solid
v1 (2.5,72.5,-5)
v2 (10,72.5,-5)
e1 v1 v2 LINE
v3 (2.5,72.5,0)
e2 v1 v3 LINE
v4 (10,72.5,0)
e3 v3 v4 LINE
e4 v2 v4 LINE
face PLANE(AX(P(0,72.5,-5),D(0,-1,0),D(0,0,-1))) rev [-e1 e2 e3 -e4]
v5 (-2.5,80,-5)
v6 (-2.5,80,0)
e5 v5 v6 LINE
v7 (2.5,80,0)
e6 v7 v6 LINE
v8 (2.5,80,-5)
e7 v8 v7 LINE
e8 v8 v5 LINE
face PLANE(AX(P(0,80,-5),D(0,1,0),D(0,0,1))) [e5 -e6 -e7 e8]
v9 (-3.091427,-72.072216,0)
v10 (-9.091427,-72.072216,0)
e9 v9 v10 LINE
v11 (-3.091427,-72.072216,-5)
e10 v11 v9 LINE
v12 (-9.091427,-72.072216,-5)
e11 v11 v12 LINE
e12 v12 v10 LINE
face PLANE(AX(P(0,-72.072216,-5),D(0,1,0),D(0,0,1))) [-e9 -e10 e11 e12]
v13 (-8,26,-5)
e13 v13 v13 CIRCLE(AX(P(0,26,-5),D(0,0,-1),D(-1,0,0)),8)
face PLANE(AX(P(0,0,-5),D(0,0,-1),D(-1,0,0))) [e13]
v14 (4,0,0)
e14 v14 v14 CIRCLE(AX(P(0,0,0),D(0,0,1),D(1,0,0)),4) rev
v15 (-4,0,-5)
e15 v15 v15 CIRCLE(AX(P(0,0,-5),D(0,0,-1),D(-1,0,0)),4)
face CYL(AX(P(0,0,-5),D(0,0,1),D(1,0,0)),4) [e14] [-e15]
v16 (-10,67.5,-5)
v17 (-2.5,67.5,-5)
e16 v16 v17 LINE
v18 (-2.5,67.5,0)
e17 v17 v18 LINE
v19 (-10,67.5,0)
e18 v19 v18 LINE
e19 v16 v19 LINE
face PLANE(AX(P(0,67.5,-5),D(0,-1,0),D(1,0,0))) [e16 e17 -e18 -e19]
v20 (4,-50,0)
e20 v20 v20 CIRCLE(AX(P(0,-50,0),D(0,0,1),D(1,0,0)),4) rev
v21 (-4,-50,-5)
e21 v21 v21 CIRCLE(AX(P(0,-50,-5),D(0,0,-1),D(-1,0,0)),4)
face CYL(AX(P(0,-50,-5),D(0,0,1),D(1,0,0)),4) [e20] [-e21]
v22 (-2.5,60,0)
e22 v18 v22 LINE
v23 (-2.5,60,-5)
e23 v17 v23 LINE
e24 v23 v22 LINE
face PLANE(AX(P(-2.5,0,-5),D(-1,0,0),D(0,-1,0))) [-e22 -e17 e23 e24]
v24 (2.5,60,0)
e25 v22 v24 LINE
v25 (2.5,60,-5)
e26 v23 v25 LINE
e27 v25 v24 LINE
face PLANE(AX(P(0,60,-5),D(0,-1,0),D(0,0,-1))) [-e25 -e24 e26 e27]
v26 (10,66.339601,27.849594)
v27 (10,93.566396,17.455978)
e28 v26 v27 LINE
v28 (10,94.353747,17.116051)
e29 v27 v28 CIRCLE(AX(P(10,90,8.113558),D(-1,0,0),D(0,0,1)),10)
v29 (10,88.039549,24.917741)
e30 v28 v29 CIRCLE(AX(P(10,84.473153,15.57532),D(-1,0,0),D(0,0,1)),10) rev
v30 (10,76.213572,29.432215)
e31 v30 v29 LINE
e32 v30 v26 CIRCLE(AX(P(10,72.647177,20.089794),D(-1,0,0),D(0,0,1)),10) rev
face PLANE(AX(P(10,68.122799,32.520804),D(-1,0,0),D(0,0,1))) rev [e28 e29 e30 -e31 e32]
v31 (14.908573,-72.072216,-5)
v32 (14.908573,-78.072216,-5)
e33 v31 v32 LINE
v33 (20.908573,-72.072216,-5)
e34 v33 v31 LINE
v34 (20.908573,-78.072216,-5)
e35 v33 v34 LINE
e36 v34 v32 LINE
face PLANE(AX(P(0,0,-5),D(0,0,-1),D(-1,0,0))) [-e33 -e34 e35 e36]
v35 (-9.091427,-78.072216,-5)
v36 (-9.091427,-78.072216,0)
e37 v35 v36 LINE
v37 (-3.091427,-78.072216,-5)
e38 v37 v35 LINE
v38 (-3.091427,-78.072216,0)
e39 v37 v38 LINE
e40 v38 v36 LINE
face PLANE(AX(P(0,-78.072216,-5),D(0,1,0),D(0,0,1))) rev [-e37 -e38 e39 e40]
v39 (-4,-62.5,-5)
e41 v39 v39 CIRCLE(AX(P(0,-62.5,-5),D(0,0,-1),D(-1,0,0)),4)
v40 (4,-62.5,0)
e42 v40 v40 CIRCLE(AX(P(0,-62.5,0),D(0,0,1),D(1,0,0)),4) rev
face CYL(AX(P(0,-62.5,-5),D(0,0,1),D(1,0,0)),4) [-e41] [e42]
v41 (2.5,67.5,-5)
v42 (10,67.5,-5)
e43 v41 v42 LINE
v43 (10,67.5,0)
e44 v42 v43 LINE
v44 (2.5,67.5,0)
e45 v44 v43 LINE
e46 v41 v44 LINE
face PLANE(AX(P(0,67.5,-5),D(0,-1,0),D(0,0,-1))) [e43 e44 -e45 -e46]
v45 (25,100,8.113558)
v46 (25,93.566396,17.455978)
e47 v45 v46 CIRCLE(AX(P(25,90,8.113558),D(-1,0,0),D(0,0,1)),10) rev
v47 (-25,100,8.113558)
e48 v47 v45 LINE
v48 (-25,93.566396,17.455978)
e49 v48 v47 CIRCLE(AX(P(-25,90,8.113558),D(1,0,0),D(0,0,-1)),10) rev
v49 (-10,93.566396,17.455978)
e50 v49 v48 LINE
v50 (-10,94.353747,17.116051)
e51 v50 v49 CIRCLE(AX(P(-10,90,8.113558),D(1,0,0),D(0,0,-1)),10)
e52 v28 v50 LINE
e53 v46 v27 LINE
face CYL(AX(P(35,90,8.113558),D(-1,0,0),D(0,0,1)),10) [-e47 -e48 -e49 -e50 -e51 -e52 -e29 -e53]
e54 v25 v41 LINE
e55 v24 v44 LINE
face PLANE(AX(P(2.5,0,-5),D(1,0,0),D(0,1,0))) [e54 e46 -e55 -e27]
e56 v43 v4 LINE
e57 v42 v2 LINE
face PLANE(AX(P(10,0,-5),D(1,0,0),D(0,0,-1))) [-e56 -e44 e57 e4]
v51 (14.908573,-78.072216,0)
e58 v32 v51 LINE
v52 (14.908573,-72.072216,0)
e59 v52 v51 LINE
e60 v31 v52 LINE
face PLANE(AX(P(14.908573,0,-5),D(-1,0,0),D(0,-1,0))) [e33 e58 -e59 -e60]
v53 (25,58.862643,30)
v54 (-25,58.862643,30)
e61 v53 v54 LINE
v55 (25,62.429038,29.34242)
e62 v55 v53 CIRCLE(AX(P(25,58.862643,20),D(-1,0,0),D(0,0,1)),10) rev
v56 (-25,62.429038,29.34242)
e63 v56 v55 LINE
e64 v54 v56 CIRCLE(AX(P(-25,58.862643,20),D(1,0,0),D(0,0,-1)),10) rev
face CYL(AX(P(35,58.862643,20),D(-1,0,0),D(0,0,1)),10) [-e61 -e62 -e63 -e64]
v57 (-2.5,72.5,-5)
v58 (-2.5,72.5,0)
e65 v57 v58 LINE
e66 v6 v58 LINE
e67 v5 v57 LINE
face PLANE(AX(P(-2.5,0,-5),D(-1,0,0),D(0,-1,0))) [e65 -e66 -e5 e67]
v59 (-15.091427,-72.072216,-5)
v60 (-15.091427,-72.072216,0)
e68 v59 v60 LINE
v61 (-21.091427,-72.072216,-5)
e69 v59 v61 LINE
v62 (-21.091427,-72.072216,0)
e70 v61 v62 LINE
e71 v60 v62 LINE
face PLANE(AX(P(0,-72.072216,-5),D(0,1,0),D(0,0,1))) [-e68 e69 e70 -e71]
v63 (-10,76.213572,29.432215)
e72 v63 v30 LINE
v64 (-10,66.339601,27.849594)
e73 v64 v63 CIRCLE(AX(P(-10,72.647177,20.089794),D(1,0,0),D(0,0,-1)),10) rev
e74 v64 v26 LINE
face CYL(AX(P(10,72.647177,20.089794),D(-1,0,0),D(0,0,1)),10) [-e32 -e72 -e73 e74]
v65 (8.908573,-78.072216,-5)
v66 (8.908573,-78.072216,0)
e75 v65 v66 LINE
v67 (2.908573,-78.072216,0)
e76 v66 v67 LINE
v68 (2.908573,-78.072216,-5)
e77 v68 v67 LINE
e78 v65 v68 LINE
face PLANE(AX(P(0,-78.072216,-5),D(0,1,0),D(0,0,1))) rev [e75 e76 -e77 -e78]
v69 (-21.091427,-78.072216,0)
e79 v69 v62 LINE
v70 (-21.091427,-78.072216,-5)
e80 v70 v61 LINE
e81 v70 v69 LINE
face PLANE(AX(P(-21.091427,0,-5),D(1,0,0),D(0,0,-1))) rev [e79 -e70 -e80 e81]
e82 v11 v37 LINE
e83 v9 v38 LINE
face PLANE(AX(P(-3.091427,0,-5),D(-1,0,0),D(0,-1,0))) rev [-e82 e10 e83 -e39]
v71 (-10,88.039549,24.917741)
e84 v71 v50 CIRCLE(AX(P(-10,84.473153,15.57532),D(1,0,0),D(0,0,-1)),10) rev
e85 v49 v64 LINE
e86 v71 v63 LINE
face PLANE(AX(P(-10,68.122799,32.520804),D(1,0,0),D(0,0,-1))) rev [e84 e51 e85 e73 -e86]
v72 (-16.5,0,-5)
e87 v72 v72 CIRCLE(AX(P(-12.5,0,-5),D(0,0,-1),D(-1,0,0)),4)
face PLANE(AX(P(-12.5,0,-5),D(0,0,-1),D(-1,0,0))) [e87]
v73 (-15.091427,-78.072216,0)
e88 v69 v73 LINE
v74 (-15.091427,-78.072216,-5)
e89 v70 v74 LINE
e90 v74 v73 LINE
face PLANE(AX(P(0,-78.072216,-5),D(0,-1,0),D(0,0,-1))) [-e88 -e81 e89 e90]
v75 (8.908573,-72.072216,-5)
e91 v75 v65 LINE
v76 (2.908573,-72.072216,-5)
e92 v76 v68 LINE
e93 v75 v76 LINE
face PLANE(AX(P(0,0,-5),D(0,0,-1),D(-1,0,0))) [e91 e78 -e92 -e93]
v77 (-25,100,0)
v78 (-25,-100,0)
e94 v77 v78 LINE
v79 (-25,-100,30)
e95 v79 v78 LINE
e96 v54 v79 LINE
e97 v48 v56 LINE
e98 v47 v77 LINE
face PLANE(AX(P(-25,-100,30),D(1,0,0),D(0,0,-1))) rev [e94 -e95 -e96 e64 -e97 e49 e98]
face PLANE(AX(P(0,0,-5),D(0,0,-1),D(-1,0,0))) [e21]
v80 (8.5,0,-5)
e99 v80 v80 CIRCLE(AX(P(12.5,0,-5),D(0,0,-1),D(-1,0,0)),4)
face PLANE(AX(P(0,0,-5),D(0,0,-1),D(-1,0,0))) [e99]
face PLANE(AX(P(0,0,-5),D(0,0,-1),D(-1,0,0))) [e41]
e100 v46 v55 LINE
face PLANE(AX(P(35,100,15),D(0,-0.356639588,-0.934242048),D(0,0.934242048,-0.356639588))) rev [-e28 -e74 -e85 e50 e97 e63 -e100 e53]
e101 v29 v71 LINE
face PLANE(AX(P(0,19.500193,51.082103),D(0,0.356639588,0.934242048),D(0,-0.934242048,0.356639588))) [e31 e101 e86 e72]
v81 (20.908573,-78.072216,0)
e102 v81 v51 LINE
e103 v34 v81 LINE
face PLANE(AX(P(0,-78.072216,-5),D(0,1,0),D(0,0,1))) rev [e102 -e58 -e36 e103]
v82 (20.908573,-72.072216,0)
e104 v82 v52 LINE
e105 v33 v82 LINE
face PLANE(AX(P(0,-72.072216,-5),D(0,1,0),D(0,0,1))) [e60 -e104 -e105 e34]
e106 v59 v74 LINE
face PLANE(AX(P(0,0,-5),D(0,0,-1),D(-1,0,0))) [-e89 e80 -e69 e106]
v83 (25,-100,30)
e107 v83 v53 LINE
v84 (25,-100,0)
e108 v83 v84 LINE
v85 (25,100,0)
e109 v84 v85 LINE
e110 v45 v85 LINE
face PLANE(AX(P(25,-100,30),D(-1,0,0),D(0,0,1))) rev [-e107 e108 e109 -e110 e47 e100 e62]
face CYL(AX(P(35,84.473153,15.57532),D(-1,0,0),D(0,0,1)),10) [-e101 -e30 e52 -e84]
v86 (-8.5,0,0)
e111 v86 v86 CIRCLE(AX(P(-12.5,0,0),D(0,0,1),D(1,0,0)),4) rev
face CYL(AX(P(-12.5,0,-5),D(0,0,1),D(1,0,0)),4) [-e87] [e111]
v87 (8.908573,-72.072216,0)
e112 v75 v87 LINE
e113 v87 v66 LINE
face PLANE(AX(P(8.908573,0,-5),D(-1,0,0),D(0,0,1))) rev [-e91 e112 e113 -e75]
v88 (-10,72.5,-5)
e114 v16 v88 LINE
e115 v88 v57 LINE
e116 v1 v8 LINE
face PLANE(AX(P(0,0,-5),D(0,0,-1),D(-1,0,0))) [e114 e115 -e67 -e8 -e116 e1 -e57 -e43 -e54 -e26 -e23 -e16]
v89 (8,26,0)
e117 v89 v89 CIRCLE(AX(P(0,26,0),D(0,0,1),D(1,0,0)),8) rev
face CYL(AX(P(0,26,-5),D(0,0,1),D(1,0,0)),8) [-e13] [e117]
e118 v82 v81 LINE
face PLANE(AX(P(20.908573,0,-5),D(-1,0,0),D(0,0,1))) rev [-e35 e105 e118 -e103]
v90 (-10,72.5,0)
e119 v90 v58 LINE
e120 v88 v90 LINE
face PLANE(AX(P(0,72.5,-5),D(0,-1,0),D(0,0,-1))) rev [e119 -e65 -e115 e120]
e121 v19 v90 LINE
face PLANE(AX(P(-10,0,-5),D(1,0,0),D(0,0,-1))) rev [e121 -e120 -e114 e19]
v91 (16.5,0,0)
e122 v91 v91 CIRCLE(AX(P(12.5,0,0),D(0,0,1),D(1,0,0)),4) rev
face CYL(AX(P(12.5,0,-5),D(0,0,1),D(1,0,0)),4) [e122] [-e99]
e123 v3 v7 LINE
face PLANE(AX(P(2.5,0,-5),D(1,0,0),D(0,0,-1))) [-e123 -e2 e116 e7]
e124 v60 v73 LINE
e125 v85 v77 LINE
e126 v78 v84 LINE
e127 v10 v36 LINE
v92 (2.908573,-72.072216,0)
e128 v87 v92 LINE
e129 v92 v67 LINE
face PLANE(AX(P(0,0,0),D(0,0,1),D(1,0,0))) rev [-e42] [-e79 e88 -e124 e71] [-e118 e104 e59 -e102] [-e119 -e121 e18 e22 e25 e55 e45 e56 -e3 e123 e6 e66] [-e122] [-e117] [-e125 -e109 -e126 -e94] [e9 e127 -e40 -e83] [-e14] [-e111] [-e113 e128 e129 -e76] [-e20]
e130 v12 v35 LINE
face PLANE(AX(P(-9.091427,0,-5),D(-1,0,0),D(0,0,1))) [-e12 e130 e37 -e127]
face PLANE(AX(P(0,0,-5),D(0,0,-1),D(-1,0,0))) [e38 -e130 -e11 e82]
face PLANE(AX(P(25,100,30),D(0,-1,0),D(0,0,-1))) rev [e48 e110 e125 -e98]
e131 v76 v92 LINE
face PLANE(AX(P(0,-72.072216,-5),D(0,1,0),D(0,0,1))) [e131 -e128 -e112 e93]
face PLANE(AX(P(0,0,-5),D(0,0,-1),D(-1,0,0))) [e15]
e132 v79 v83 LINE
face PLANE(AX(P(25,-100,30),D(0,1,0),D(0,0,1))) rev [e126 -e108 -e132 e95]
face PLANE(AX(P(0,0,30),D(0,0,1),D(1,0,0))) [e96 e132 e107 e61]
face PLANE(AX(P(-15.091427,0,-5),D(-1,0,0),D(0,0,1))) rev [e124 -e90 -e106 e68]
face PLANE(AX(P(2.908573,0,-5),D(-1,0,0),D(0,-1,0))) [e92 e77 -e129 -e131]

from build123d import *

# Parameters (mm, degrees)
CROQUIS1_W              = 50
CROQUIS1_H              = 200
SALIENTE_EXTRUIR1_DEPTH = 30
CORTAR_EXTRUIR1_DEPTH   = 60
CROQUIS3_W              = 20
CROQUIS3_H              = 30
SALIENTE_EXTRUIR2_DEPTH = 5
REDONDEO1_R             = 10
REDONDEO2_R             = 10
CROQUIS5_W              = 6
CROQUIS5_H              = 6
CROQUIS5_R              = 8
CROQUIS5_R_2            = 4
SALIENTE_EXTRUIR3_DEPTH = 5


with BuildPart() as part:
    # Croquis1 → Saliente-Extruir1 (new body)
    with BuildSketch(Plane.XY):
        Rectangle(CROQUIS1_W, CROQUIS1_H)
    extrude(amount=SALIENTE_EXTRUIR1_DEPTH)

    # Croquis2 → Cortar-Extruir1 (cut)
    with BuildSketch(Plane.ZY.offset(25)):
        Polygon((15, 100), (30, 60.706463385), (30, 100), align=None)
    extrude(amount=-CORTAR_EXTRUIR1_DEPTH, mode=Mode.SUBTRACT)

    # Croquis3 → Saliente-Extruir2 (add)
    with BuildSketch(Plane(origin=(0, 17.716995079, 46.41089299), x_dir=(1, 0, 0), z_dir=(0, 0.356639588239418, 0.9342420479192843))):
        with Locations((0, 67.044976998)):
            Rectangle(CROQUIS3_W, CROQUIS3_H)
    extrude(amount=SALIENTE_EXTRUIR2_DEPTH)

    # Redondeo1
    # the kernel refuses this fillet: 10 mm, written as the material it takes off along each edge
    with BuildSketch(Plane(origin=(-29.60955221, 60.706463385, 30), x_dir=(0, -1, 0), z_dir=(1, 0, 0))) as redondeo1_piece_1:
        with BuildLine():
            CenterArc((REDONDEO1_R * 0.184382088386, REDONDEO1_R), REDONDEO1_R, 249.106035538, 20.893964462)
            Line((-REDONDEO1_R * 0.172257499853, REDONDEO1_R * 0.0657579520807), (0, 0))
            Line((0, 0), (REDONDEO1_R * 0.184382088386, 0))
        make_face()
    extrude(amount=59.219104419, mode=Mode.SUBTRACT)
    with BuildSketch(Plane(origin=(-42.216106179, 100, 15), x_dir=(0, -0.934242047919284, 0.3566395882394187), z_dir=(1, 0, 0))) as redondeo1_piece_2_section:
        with BuildLine():
            CenterArc((REDONDEO1_R * 0.688644247166, REDONDEO1_R), REDONDEO1_R, 200.893964462, 69.106035538)
            Line((-REDONDEO1_R * 0.245597800753, REDONDEO1_R * 0.643360411761), (0, 0))
            Line((0, 0), (REDONDEO1_R * 0.688644247166, 0))
        make_face()
    redondeo1_piece_2 = extrude(amount=84.432212358, mode=Mode.PRIVATE)
    redondeo1_piece_2 = split(redondeo1_piece_2, bisect_by=Plane(origin=(-10, 94.011560914, 17.386219939), z_dir=(-1, 0, 0)), keep=Keep.TOP, mode=Mode.PRIVATE)
    redondeo1_piece_2 = split(redondeo1_piece_2, bisect_by=Plane(origin=(-26.10805309, 94.400241221, 17.237844274), z_dir=(0, -0.9342420479192843, 0.35663958823941805)), keep=Keep.TOP, mode=Mode.PRIVATE)
    add(redondeo1_piece_2, mode=Mode.SUBTRACT)
    with BuildSketch(Plane(origin=(-42.216106179, 100, 15), x_dir=(0, -0.934242047919284, 0.3566395882394187), z_dir=(1, 0, 0))) as redondeo1_piece_3_section:
        with BuildLine():
            CenterArc((REDONDEO1_R * 0.688644247166, REDONDEO1_R), REDONDEO1_R, 200.893964462, 69.106035538)
            Line((-REDONDEO1_R * 0.245597800753, REDONDEO1_R * 0.643360411761), (0, 0))
            Line((0, 0), (REDONDEO1_R * 0.688644247166, 0))
        make_face()
    redondeo1_piece_3 = extrude(amount=84.432212358, mode=Mode.PRIVATE)
    redondeo1_piece_3 = split(redondeo1_piece_3, bisect_by=Plane(origin=(-10, 98.665500542, 13.974903393), z_dir=(-1, 0, 0)), keep=Keep.TOP, mode=Mode.PRIVATE)
    redondeo1_piece_3 = split(redondeo1_piece_3, bisect_by=Plane(origin=(-26.10805309, 93.855575449, 15.811054644), z_dir=(0, 0.9342420479192843, -0.35663958823941805)), keep=Keep.TOP, mode=Mode.PRIVATE)
    add(redondeo1_piece_3, mode=Mode.SUBTRACT)
    with BuildSketch(Plane(origin=(-42.216106179, 100, 15), x_dir=(0, -0.934242047919284, 0.3566395882394187), z_dir=(1, 0, 0))) as redondeo1_piece_4_section:
        with BuildLine():
            CenterArc((REDONDEO1_R * 0.688644247166, REDONDEO1_R), REDONDEO1_R, 200.893964462, 69.106035538)
            Line((-REDONDEO1_R * 0.245597800753, REDONDEO1_R * 0.643360411761), (0, 0))
            Line((0, 0), (REDONDEO1_R * 0.688644247166, 0))
        make_face()
    redondeo1_piece_4 = extrude(amount=84.432212358, mode=Mode.PRIVATE)
    redondeo1_piece_4 = split(redondeo1_piece_4, bisect_by=Plane(origin=(-10, 98.665500542, 13.974903393), z_dir=(1, 0, 0)), keep=Keep.TOP, mode=Mode.PRIVATE)
    redondeo1_piece_4 = split(redondeo1_piece_4, bisect_by=Plane(origin=(0, 93.855575449, 15.811054644), z_dir=(0, 0.9342420479192843, -0.35663958823941805)), keep=Keep.TOP, mode=Mode.PRIVATE)
    redondeo1_piece_4 = split(redondeo1_piece_4, bisect_by=Plane(origin=(10, 98.665500542, 13.974903393), z_dir=(-1, 0, 0)), keep=Keep.TOP, mode=Mode.PRIVATE)
    add(redondeo1_piece_4, mode=Mode.SUBTRACT)
    with BuildSketch(Plane(origin=(-42.216106179, 100, 15), x_dir=(0, -0.934242047919284, 0.3566395882394187), z_dir=(1, 0, 0))) as redondeo1_piece_5_section:
        with BuildLine():
            CenterArc((REDONDEO1_R * 0.688644247166, REDONDEO1_R), REDONDEO1_R, 200.893964462, 69.106035538)
            Line((-REDONDEO1_R * 0.245597800753, REDONDEO1_R * 0.643360411761), (0, 0))
            Line((0, 0), (REDONDEO1_R * 0.688644247166, 0))
        make_face()
    redondeo1_piece_5 = extrude(amount=84.432212358, mode=Mode.PRIVATE)
    redondeo1_piece_5 = split(redondeo1_piece_5, bisect_by=Plane(origin=(26.10805309, 94.400241221, 17.237844274), z_dir=(0, -0.9342420479192843, 0.35663958823941805)), keep=Keep.TOP, mode=Mode.PRIVATE)
    redondeo1_piece_5 = split(redondeo1_piece_5, bisect_by=Plane(origin=(10, 94.011560914, 17.386219939), z_dir=(1, 0, 0)), keep=Keep.TOP, mode=Mode.PRIVATE)
    add(redondeo1_piece_5, mode=Mode.SUBTRACT)
    with BuildSketch(Plane(origin=(-42.216106179, 100, 15), x_dir=(0, -0.934242047919284, 0.3566395882394187), z_dir=(1, 0, 0))) as redondeo1_piece_6_section:
        with BuildLine():
            CenterArc((REDONDEO1_R * 0.688644247166, REDONDEO1_R), REDONDEO1_R, 200.893964462, 69.106035538)
            Line((-REDONDEO1_R * 0.245597800753, REDONDEO1_R * 0.643360411761), (0, 0))
            Line((0, 0), (REDONDEO1_R * 0.688644247166, 0))
        make_face()
    redondeo1_piece_6 = extrude(amount=84.432212358, mode=Mode.PRIVATE)
    redondeo1_piece_6 = split(redondeo1_piece_6, bisect_by=Plane(origin=(26.10805309, 93.855575449, 15.811054644), z_dir=(0, 0.9342420479192843, -0.35663958823941805)), keep=Keep.TOP, mode=Mode.PRIVATE)
    redondeo1_piece_6 = split(redondeo1_piece_6, bisect_by=Plane(origin=(10, 98.665500542, 13.974903393), z_dir=(1, 0, 0)), keep=Keep.TOP, mode=Mode.PRIVATE)
    add(redondeo1_piece_6, mode=Mode.SUBTRACT)

    # Redondeo2
    # the kernel refuses this fillet: 10 mm, written as the material it takes off along each edge
    with BuildSketch(Plane(origin=(31.650635095, 68.122798915, 32.520804063), x_dir=(0, 0.9342420479192848, -0.3566395882394171), z_dir=(-1, 0, 0))) as redondeo2_piece_1:
        with BuildLine():
            CenterArc((8.660254038, 10), REDONDEO2_R, 210, 60)
            Line((0, 5), (-0.173205081, 4.9))
            ThreePointArc((-0.173205081, 4.9), (-0.2, 2.5), (-0.2, 0))
            Line((-0.2, 0), (0, -0.2))
            Line((0, -0.2), (8.660254038, -0.2))
            Line((8.660254038, -0.2), (8.660254038, 0))
        make_face()
    extrude(amount=63.301270189, mode=Mode.SUBTRACT)
    with BuildSketch(Plane(origin=(-31.703453679, 96.150060353, 21.821616416), x_dir=(0, -0.3566395882395135, -0.9342420479192478), z_dir=(1, 0, 0))) as redondeo2_piece_2:
        with BuildLine():
            CenterArc((10, -8.681381471), REDONDEO2_R, 119.757004223, 60.242995777)
            Line((0, -8.681381471), (-0.2, -8.681381471))
            Line((-0.2, -8.681381471), (-0.2, 0))
            Line((-0.2, 0), (0, 0.2))
            ThreePointArc((0, 0.2), (2.518386828, 0.2), (4.937509129, 0.173627629))
            Line((4.937509129, 0.173627629), (5.036773655, 0))
        make_face()
    extrude(amount=63.406907357, mode=Mode.SUBTRACT)

    # Croquis5 → Saliente-Extruir3 (add)
    with BuildSketch(Plane(origin=(0, 0, 0), x_dir=(-1, 0, 0), z_dir=(0, 0, -1))):
        Polygon((-2.5, 80), (-2.5, 72.5), (-10, 72.5), (-10, 67.5), (-2.5, 67.5), (-2.5, 60), (2.5, 60), (2.5, 67.5), (10, 67.5), (10, 72.5), (2.5, 72.5), (2.5, 80), align=None)
        with Locations((-17.908573371, -75.072215566)):
            Rectangle(CROQUIS5_W, CROQUIS5_H)
        with Locations((18.091426629, -75.072215566)):
            Rectangle(CROQUIS5_W, CROQUIS5_H)
        with Locations((-5.908573371, -75.072215566)):
            Rectangle(CROQUIS5_W, CROQUIS5_H)
        with Locations((6.091426629, -75.072215566)):
            Rectangle(CROQUIS5_W, CROQUIS5_H)
        with Locations(Location((0, 26, 0), (0, 0, 180))):
            Circle(CROQUIS5_R)
        with Locations(Location((0, 0, 0), (0, 0, 180))):
            Circle(CROQUIS5_R_2)
        with Locations(Location((-12.5, 0, 0), (0, 0, 180))):
            Circle(CROQUIS5_R_2)
        with Locations(Location((12.5, 0, 0), (0, 0, 180))):
            Circle(CROQUIS5_R_2)
        with Locations(Location((0, -50, 0), (0, 0, 180))):
            Circle(CROQUIS5_R_2)
        with Locations(Location((0, -62.5, 0), (0, 0, 180))):
            Circle(CROQUIS5_R_2)
    extrude(amount=SALIENTE_EXTRUIR3_DEPTH)


solid = part.part
